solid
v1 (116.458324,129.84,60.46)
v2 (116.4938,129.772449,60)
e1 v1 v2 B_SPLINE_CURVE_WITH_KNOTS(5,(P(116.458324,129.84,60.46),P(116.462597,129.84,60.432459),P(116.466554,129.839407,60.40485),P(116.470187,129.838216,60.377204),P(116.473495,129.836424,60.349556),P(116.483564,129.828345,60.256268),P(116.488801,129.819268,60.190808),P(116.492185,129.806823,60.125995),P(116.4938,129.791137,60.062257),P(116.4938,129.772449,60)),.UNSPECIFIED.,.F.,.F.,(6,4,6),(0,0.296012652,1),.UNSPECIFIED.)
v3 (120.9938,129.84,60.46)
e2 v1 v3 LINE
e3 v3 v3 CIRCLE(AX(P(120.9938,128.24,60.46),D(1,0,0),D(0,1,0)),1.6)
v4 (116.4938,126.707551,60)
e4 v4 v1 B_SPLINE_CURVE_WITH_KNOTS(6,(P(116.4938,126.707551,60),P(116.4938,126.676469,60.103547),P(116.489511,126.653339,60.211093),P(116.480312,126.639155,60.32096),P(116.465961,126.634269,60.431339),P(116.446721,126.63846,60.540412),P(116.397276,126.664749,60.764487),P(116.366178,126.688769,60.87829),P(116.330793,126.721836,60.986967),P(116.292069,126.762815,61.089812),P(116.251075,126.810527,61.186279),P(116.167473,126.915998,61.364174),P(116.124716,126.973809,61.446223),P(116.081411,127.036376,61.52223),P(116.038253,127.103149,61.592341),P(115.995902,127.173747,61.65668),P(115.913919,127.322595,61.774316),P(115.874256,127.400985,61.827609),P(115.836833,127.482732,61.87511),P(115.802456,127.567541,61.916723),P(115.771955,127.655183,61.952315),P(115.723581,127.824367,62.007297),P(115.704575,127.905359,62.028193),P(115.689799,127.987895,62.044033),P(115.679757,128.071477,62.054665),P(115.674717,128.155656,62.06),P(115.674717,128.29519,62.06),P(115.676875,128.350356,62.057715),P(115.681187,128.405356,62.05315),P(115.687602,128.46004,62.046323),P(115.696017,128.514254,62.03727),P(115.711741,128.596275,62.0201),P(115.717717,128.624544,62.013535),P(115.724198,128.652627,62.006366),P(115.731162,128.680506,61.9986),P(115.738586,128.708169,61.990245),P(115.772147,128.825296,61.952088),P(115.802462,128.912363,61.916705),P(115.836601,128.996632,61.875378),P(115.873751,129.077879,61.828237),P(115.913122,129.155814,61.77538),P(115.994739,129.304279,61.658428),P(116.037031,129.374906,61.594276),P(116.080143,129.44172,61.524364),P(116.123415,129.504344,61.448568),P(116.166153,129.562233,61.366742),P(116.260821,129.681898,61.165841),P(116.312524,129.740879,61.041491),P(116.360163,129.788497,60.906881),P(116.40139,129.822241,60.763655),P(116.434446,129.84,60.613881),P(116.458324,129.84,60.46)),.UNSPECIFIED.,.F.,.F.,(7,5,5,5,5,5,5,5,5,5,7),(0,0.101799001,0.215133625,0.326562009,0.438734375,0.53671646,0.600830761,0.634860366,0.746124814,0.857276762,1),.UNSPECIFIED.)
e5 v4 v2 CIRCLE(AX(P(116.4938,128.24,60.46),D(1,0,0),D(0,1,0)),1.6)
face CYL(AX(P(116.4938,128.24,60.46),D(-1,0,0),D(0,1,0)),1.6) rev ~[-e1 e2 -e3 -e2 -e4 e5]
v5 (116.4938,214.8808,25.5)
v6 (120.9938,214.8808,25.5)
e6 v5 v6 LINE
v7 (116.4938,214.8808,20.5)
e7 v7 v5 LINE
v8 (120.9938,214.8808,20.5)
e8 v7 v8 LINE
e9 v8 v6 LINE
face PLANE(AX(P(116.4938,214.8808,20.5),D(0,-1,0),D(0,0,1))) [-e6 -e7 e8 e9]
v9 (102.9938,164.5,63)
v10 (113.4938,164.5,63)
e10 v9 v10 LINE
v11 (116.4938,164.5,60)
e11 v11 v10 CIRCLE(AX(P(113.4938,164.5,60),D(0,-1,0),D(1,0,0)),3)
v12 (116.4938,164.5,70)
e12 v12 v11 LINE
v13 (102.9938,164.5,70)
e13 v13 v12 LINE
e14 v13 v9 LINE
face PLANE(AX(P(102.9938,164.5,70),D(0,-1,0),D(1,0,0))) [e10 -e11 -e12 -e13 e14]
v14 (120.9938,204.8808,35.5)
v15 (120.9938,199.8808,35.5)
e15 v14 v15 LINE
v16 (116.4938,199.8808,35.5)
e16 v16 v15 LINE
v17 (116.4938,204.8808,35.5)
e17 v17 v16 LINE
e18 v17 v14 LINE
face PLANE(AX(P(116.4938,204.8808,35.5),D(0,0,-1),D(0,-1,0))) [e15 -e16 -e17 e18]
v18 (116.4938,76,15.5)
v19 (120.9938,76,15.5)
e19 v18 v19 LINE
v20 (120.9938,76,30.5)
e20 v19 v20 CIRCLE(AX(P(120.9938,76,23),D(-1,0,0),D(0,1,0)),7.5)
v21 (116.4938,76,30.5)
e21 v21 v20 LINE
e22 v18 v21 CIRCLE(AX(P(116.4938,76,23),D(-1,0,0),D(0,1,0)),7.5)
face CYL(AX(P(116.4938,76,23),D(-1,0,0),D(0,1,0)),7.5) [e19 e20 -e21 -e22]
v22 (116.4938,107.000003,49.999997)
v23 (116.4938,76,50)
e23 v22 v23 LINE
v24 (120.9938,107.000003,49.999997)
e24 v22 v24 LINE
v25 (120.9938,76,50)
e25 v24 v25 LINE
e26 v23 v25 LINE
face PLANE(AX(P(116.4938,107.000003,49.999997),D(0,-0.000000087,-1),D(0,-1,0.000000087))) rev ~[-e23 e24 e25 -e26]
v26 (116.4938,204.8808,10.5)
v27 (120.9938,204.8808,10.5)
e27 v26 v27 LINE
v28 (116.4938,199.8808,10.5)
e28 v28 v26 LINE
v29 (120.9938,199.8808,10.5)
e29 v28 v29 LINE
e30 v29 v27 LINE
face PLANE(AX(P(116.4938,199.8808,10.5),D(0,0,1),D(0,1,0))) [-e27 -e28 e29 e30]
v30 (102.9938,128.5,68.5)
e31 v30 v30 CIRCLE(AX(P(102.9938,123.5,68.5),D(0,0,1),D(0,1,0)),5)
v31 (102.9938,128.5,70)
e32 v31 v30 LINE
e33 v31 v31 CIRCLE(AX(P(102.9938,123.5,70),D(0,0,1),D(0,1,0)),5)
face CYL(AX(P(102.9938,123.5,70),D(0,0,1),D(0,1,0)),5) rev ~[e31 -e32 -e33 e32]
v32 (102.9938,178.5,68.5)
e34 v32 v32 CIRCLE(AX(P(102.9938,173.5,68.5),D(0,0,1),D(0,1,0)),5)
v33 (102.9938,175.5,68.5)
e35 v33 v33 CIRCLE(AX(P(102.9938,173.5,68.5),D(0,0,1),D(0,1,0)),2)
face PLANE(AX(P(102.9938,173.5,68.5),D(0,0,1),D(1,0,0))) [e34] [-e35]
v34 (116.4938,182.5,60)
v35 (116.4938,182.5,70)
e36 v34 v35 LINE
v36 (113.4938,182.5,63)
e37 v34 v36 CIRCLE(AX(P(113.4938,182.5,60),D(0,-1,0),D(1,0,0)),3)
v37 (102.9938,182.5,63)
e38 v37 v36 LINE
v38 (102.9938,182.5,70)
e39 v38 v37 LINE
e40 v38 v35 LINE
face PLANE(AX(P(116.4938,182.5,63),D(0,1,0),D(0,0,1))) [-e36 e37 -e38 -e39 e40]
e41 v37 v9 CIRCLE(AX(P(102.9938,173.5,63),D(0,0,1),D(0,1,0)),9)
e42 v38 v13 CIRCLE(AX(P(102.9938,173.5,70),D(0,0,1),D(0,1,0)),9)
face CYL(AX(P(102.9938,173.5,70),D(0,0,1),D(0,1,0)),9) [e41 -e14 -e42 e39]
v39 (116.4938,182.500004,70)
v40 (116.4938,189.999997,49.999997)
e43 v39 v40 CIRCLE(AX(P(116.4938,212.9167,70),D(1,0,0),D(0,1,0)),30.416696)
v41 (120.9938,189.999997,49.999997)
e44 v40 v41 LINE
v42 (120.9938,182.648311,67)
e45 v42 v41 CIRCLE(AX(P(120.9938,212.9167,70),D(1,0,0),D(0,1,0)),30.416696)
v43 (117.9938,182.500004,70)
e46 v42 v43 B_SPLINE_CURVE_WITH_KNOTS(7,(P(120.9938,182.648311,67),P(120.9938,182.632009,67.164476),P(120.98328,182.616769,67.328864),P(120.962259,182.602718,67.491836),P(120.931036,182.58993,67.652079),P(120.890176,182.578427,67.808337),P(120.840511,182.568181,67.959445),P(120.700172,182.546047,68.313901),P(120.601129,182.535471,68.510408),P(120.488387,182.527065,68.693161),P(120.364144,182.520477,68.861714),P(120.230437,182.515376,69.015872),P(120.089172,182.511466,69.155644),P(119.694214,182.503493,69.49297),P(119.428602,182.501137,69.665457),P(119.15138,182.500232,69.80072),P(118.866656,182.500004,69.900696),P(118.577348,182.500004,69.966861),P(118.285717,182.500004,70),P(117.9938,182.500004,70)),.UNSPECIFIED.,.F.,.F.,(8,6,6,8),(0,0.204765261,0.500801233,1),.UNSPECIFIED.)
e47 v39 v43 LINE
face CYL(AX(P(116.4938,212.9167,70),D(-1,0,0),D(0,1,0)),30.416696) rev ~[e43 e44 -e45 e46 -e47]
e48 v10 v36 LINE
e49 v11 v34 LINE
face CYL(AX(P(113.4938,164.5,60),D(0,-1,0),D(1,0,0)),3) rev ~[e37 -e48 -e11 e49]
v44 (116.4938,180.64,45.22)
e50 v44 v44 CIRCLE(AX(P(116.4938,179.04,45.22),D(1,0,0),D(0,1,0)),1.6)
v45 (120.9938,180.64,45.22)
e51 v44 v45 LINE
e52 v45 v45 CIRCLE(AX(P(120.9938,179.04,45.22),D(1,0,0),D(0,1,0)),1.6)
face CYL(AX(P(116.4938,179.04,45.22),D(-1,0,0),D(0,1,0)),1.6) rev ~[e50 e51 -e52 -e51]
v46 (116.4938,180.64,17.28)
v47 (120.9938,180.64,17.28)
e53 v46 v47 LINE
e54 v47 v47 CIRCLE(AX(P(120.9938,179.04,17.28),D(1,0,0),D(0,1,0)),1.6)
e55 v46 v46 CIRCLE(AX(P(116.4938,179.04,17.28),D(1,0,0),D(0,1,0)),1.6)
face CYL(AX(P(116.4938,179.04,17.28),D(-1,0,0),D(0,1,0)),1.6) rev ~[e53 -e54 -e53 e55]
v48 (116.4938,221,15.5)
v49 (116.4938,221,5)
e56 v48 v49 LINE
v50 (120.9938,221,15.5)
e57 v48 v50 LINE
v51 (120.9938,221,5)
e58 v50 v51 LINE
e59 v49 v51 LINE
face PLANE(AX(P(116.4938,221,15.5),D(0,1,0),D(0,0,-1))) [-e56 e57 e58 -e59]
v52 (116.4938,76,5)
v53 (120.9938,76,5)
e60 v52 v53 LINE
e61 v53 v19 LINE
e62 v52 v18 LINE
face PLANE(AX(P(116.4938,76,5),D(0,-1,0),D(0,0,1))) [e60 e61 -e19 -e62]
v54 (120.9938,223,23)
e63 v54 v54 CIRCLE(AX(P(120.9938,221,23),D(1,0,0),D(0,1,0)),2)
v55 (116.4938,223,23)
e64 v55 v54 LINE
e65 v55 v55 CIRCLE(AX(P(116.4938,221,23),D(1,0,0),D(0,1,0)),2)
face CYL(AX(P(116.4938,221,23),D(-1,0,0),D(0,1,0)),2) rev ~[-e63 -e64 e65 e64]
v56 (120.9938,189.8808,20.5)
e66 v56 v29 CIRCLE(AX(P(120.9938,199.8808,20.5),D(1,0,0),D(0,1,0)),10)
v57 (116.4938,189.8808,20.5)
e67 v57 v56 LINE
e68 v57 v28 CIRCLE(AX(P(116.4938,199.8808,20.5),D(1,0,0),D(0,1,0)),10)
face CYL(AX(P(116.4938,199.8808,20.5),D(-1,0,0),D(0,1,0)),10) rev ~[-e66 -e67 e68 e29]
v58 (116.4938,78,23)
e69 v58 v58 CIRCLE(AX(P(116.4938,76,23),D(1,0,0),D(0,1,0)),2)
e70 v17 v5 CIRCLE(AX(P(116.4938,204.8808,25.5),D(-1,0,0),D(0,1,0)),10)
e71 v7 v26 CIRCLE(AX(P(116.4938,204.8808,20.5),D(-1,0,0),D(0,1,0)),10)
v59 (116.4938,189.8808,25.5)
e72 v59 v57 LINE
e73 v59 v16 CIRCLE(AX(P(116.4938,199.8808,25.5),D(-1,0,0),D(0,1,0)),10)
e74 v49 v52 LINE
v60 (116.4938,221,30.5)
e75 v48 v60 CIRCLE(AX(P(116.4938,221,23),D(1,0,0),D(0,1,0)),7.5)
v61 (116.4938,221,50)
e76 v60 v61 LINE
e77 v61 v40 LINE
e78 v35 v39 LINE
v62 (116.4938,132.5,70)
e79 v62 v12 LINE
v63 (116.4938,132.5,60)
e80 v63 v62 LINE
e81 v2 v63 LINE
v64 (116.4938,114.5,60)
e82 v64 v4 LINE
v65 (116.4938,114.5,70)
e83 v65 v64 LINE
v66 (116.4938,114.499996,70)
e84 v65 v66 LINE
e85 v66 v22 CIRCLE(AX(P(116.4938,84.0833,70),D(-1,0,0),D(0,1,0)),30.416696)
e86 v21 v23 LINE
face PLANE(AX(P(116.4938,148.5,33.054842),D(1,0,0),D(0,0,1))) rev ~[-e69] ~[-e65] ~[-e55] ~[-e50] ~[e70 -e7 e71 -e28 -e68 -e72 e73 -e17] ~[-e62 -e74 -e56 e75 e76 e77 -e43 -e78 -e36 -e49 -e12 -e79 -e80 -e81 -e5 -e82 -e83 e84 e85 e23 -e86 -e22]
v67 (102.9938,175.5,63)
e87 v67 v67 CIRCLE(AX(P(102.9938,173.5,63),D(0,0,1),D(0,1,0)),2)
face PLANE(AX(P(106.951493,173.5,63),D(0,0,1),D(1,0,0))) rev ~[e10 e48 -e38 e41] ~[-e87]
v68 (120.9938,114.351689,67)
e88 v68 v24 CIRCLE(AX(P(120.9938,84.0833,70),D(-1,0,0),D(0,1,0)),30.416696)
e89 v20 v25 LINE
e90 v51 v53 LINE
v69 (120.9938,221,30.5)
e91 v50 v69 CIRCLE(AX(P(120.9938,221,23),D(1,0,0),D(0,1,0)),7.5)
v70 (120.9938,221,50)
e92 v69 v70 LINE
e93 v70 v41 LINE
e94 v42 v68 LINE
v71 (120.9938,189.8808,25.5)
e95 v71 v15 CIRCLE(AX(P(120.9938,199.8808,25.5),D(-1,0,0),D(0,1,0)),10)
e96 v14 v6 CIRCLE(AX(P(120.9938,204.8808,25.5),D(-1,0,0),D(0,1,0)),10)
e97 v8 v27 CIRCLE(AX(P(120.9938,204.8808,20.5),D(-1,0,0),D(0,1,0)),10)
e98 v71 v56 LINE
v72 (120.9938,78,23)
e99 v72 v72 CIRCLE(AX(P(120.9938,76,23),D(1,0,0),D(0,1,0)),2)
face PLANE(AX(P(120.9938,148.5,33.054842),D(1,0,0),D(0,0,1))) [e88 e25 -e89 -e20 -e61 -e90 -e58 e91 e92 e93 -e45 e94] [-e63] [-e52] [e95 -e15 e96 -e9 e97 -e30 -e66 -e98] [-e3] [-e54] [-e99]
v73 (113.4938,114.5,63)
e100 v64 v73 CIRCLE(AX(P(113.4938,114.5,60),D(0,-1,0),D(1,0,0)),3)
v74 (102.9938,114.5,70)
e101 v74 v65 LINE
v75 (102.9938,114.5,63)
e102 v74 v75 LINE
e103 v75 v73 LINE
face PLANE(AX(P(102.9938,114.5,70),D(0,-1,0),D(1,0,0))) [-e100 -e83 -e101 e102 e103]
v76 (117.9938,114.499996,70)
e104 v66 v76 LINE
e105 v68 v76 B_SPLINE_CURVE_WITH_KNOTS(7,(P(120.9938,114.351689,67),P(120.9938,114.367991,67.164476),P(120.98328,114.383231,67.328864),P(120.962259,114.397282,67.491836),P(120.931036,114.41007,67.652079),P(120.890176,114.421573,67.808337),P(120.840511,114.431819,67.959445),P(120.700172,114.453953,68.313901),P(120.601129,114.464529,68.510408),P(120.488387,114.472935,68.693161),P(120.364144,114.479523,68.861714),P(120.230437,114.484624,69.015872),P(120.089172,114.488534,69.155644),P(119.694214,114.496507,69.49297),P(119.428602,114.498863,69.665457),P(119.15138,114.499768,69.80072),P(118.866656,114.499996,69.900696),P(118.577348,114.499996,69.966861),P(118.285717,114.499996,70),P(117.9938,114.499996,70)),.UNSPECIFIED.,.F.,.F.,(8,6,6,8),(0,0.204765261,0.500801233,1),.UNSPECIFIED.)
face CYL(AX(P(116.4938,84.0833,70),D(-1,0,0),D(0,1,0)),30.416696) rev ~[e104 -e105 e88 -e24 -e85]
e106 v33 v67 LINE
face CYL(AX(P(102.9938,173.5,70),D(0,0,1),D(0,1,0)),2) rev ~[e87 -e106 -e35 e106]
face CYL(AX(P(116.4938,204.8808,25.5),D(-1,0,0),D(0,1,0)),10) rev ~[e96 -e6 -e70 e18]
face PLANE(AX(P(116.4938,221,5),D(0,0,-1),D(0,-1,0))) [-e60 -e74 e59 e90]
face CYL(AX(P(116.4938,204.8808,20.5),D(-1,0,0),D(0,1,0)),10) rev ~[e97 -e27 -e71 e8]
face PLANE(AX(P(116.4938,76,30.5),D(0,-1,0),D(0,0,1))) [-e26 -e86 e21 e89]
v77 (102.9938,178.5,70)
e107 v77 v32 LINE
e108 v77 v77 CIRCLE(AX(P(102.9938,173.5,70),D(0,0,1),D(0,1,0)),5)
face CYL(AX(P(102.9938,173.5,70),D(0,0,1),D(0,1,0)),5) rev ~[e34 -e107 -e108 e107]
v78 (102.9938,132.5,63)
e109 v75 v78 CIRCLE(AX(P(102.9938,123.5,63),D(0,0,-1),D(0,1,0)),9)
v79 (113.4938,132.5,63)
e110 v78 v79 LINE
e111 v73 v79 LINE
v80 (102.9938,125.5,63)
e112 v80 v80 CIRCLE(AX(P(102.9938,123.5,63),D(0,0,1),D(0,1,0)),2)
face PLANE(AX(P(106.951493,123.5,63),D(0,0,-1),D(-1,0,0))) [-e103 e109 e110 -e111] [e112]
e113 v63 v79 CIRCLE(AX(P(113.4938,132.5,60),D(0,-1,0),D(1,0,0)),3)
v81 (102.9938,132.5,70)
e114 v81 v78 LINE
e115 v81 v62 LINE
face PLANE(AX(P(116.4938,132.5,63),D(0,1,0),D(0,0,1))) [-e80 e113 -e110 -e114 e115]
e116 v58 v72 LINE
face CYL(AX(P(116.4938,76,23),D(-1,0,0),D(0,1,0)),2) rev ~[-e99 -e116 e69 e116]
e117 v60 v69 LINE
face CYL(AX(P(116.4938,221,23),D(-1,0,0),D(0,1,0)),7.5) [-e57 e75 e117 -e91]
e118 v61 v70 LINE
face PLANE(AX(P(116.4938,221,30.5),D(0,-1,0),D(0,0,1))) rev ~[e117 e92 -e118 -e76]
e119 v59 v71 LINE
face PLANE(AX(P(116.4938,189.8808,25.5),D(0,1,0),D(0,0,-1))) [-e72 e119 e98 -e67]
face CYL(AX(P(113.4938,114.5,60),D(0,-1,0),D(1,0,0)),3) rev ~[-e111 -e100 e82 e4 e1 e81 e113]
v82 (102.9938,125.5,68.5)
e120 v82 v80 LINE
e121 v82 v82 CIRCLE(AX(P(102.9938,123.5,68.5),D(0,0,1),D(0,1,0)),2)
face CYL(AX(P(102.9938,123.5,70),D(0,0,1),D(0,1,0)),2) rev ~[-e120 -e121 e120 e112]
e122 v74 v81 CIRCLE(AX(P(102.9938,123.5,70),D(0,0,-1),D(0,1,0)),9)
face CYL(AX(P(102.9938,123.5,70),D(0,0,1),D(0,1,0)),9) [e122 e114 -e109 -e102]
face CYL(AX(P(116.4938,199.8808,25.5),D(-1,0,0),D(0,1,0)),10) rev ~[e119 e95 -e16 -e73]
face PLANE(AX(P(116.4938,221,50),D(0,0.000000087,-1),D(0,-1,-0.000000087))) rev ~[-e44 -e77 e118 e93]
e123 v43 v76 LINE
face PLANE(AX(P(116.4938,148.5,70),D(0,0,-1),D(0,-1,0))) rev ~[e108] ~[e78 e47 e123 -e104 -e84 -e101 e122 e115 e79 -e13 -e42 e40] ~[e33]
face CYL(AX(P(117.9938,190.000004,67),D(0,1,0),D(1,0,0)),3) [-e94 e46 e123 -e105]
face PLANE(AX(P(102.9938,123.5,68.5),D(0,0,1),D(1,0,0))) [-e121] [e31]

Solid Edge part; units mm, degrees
extrude "Protrusion1" [suppressed]
sketch "Sketch1" plane through (116.4938, 148.5, 37.25) normal (1, 0, 0) x (0, 1, 0)
  line L0 (72.5, -6.75) -> (72.5, 12.75)
  line L1 (72.5, 12.75) -> (41.5, 12.75)
  arc A0 (34, 32.75) -> (41.5, 12.75) centre (64.4167, 32.75) ccw
  line L2 (0, 32.75) -> (34, 32.75)
  line L3 (0, 32.75) -> (-34, 32.75)
  arc A1 (-34, 32.75) -> (-41.5, 12.75) centre (-64.4167, 32.75) cw
  line L4 (-41.5, 12.75) -> (-72.5, 12.75)
  line L5 (-72.5, -6.75) -> (-72.5, 12.75)
  arc A2 (-72.5, -21.75) -> (-72.5, -6.75) centre (-72.5, -14.25) cw
  line L6 (-72.5, -32.25) -> (-72.5, -21.75)
  line L7 (72.5, -32.25) -> (-72.5, -32.25)
  line L8 (72.5, -21.75) -> (72.5, -32.25)
  arc A3 (72.5, -21.75) -> (72.5, -6.75) centre (72.5, -14.25) ccw
  circle A4 centre (72.5, -14.25) radius 2
  circle A5 centre (-72.5, -14.25) radius 2
  circle A6 centre (-20.26, 23.21) radius 1.6
  circle A7 centre (30.54, 7.97) radius 1.6
  circle A8 centre (30.54, -19.97) radius 1.6
  line L9 (66.3808, -16.75) -> (66.3808, -11.75)
  arc A9 (56.3808, -1.75) -> (66.3808, -11.75) centre (56.3808, -11.75) cw
  line L10 (56.3808, -1.75) -> (51.3808, -1.75)
  arc A10 (41.3808, -11.75) -> (51.3808, -1.75) centre (51.3808, -11.75) cw
  line L11 (41.3808, -11.75) -> (41.3808, -16.75)
  arc A11 (41.3808, -16.75) -> (51.3808, -26.75) centre (51.3808, -16.75) ccw
  line L12 (51.3808, -26.75) -> (56.3808, -26.75)
  arc A12 (66.3808, -16.75) -> (56.3808, -26.75) centre (56.3808, -16.75) cw
extrude "Protrusion2" add sketch "Sketch1" along normal blind 4.5
sketch "Sketch2" plane through (106.8492, 148.5, 70) normal (0, 0, 1) x (0, 1, 0)
  circle A0 centre (-25, 3.8554) radius 2
  line L0 (-16, 3.8554) -> (-16, -9.6446)
  line L1 (-34, -9.6446) -> (-16, -9.6446)
  line L2 (-34, 3.8554) -> (-34, -9.6446)
  arc A1 (-34, 3.8554) -> (-16, 3.8554) centre (-25, 3.8554) cw
  circle A2 centre (25, 3.8554) radius 2
  line L3 (16, 3.8554) -> (16, -9.6446)
  line L4 (16, -9.6446) -> (34, -9.6446)
  line L5 (34, 3.8554) -> (34, -9.6446)
  arc A3 (34, 3.8554) -> (16, 3.8554) centre (25, 3.8554) ccw
extrude "ProtrusiónExtruida_24" add sketch "Sketch2" against normal blind 7
fillet "Redondeo_4" radius 3 5 edges at (116.4938, 173.5, 63) (116.4938, 123.5, 63) (116.4938, 173.5, 63) (116.4938, 123.5, 63) (120.9938, 148.5, 70)
fillet "Redondeo_5" [suppressed]
sketch "Sketch3" plane through (108.6188, 148.5, 70) normal (0, 0, 1) x (0, 1, 0)
  circle A0 centre (-25, 5.625) radius 5
  circle A1 centre (25, 5.625) radius 5
extrude "VaciadoExtruido_57" cut sketch "Sketch3" along normal mid plane 3
